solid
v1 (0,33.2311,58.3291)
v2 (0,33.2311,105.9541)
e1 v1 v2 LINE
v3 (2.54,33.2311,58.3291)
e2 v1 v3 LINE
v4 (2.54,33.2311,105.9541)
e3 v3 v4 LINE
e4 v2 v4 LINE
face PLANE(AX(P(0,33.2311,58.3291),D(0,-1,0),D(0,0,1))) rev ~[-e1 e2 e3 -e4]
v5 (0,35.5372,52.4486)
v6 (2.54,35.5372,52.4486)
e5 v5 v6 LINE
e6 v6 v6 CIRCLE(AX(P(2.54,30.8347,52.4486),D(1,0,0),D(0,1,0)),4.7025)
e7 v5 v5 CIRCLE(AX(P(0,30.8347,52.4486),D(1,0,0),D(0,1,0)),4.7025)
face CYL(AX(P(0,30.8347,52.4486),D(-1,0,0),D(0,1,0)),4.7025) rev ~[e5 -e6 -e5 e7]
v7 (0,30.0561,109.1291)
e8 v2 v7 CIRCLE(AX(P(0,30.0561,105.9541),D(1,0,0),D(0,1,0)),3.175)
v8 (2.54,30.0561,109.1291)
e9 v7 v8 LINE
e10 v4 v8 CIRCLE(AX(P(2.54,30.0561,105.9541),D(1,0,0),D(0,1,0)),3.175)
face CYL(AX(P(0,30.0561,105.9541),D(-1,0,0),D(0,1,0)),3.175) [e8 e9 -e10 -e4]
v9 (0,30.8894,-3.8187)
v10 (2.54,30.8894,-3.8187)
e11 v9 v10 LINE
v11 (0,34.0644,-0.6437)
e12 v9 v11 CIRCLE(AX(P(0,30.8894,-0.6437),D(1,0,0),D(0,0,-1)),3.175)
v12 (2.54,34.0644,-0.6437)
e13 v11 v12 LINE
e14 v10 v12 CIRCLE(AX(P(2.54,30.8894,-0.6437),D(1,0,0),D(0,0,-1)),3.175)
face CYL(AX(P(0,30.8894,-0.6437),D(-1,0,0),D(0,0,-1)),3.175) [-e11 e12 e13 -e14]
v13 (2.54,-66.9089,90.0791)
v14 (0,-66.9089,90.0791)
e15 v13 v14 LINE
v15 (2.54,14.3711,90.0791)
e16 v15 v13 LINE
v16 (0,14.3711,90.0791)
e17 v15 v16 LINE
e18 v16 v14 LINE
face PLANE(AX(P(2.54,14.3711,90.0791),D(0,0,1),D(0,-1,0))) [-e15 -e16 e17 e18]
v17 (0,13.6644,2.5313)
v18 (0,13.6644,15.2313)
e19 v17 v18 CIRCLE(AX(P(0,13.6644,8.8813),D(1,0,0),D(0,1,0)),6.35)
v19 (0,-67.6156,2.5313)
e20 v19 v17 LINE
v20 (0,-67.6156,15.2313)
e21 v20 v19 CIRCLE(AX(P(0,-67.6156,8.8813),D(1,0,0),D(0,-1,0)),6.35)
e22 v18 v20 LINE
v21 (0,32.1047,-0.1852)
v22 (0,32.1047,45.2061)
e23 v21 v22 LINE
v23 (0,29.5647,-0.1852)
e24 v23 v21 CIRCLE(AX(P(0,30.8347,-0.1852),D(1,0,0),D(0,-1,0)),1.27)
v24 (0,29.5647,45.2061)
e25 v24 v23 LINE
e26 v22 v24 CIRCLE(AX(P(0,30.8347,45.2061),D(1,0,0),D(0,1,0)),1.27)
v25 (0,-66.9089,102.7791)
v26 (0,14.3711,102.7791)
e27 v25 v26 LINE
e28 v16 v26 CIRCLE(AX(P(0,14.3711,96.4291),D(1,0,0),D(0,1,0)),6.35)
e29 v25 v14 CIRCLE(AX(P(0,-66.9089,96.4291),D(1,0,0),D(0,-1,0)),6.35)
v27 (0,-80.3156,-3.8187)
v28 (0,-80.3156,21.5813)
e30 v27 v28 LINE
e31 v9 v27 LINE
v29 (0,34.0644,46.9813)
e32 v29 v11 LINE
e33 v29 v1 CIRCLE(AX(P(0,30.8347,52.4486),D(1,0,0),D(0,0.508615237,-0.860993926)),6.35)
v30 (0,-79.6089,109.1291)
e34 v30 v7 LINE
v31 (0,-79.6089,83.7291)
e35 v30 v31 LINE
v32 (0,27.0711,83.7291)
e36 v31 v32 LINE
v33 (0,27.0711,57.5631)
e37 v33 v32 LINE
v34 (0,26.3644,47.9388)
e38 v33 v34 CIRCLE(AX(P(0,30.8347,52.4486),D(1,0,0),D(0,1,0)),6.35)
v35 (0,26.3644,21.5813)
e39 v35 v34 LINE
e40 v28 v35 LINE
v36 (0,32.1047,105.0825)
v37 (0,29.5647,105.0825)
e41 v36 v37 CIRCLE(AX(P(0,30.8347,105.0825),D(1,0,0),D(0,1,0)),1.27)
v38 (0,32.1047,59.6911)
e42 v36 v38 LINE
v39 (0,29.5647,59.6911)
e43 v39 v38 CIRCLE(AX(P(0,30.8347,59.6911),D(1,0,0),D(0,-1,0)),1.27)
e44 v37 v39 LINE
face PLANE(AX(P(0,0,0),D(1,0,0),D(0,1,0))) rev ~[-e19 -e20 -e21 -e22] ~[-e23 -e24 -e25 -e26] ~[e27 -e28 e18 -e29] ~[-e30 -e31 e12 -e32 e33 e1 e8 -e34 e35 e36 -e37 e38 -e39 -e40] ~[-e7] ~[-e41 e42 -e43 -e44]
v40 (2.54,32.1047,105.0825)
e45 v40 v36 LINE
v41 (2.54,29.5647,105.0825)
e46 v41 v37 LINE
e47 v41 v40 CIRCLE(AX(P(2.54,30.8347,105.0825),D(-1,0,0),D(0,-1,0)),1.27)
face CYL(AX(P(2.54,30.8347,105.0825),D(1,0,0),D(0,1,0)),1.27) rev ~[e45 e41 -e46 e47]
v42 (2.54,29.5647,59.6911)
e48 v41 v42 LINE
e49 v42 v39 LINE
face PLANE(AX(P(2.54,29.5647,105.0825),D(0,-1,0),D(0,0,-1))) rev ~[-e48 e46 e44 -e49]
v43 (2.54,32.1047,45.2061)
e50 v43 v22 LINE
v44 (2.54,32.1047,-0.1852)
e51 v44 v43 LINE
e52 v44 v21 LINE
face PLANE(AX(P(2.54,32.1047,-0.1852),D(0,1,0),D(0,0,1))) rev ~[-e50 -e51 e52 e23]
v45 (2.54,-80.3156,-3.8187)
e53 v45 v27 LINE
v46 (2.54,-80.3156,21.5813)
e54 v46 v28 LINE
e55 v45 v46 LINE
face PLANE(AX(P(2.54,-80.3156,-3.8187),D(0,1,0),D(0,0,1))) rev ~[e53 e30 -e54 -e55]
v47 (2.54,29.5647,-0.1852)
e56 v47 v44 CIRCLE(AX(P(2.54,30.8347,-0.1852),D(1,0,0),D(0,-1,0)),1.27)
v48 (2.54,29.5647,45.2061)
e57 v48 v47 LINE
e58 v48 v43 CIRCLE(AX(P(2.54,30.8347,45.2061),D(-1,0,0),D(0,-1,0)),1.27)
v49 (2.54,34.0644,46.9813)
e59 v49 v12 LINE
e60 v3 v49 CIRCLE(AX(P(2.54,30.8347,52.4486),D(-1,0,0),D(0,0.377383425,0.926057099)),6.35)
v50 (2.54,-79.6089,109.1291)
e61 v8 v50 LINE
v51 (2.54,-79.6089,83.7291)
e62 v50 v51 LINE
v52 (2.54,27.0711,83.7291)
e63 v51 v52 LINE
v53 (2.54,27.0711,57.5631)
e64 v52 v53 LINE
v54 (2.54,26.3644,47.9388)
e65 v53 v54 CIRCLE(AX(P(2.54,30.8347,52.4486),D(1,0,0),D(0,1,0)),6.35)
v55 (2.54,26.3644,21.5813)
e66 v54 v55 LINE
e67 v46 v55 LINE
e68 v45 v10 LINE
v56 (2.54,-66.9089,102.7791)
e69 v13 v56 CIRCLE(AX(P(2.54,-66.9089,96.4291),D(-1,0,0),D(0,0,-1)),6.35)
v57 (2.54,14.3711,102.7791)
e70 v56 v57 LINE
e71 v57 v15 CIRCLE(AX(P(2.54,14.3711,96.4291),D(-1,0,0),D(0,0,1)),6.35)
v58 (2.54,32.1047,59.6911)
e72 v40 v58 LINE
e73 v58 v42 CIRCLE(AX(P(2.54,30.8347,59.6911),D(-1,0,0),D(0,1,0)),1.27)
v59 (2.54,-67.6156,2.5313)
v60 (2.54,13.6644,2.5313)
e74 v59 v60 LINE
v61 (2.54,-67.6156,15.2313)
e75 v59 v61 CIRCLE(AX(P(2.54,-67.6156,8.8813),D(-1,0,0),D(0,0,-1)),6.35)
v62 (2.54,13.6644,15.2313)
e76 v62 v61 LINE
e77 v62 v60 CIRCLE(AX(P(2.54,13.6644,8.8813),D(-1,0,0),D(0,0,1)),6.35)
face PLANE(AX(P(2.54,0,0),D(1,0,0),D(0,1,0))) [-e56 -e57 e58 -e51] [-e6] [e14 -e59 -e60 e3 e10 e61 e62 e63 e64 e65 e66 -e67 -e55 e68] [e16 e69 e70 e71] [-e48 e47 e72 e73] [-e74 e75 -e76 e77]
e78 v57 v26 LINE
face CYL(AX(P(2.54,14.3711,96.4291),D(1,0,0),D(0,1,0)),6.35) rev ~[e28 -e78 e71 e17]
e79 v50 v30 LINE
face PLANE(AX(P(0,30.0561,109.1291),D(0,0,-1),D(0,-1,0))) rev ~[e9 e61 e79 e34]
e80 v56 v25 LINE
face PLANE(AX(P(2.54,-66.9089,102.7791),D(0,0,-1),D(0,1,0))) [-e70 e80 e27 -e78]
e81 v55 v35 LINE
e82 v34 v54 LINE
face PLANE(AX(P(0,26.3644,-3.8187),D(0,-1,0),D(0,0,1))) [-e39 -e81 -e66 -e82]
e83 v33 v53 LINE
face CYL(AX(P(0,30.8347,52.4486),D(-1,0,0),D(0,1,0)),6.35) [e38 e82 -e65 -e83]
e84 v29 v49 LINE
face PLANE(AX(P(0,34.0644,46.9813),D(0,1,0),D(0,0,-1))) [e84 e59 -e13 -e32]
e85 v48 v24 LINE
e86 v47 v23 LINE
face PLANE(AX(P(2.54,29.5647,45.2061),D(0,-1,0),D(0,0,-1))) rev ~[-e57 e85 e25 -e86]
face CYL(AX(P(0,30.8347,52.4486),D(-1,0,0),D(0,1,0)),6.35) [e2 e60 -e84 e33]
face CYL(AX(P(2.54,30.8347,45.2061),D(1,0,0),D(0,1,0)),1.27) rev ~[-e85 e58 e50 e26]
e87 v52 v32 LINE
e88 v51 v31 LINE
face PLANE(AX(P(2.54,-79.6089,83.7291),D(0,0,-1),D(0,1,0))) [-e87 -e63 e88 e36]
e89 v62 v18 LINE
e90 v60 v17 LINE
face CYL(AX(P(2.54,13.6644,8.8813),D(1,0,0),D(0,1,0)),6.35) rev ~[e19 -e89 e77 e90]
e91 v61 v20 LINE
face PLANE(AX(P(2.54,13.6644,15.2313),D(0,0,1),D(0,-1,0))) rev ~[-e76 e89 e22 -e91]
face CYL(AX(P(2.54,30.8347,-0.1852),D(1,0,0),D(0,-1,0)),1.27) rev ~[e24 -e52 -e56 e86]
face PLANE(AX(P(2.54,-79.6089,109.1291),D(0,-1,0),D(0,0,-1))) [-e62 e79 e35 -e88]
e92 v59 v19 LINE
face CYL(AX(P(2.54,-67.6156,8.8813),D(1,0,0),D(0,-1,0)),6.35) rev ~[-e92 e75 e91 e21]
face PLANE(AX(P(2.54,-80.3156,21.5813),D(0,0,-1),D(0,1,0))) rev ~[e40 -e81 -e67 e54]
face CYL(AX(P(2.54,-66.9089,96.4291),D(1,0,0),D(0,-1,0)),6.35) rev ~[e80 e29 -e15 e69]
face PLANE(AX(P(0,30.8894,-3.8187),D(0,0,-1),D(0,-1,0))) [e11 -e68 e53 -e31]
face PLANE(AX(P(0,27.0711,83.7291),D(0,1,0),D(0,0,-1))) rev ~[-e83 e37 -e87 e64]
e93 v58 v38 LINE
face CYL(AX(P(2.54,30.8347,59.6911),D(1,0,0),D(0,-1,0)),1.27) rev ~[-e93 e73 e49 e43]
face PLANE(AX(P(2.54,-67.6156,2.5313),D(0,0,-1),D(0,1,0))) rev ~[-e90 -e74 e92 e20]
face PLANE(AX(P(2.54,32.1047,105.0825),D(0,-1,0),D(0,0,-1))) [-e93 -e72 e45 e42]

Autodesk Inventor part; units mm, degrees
ref_plane "YZ Plane" through (0, 0, 0) normal (1, 0, 0) x (0, 1, 0)
ref_plane "XZ Plane" through (0, 0, 0) normal (0, 1, 0) x (-1, 0, 0)
ref_plane "XY Plane" through (0, 0, 0) normal (0, 0, 1) x (1, 0, 0)
sketch "Sketch1" plane through (0, 0, 0) normal (1, 0, 0) x (0, 1, 0)
  circle A0 centre (30.8347, 52.4486) radius 6.35
  line L0 (34.0644, 46.9813) -> (34.0644, -0.6437)
  line L1 (33.2311, 58.3291) -> (33.2311, 105.9541)
  line L2 (30.0561, 109.1291) -> (27.0711, 109.1291)
  arc A1 (33.2311, 105.9541) -> (30.0561, 109.1291) centre (30.0561, 105.9541) ccw
  line L3 (30.8894, -3.8187) -> (26.3644, -3.8187)
  arc A2 (30.8894, -3.8187) -> (34.0644, -0.6437) centre (30.8894, -0.6437) ccw
  line L4 (27.0711, 109.1291) -> (27.0711, 57.5631)
  line L5 (26.3644, -3.8187) -> (26.3644, 47.9388)
  line L6 (27.0711, 109.1291) -> (27.0711, 83.7291)
  line L7 (27.0711, 109.1291) -> (-79.6089, 109.1291)
  line L8 (-79.6089, 109.1291) -> (-79.6089, 83.7291)
  line L9 (-79.6089, 83.7291) -> (27.0711, 83.7291)
  line L10 (26.3644, -3.8187) -> (-80.3156, -3.8187)
  line L11 (-80.3156, -3.8187) -> (-80.3156, 21.5813)
  line L12 (26.3644, -3.8187) -> (26.3644, 21.5813)
  line L13 (26.3644, 21.5813) -> (-80.3156, 21.5813)
  circle A3 centre (30.8347, 52.4486) radius 4.7025
  point P0 (34.0644, -3.8187)
  point P1 (33.2311, 109.1291)
  dimension "d3" = 50.8
  dimension "d4" = 50.8
  dimension "d5" = 6.16
  dimension "d6" = 3.175
  dimension "d7" = 3.175
  dimension "d8" = 25.4
  dimension "d9" = 106.68
  dimension "d10" = 106.68
  dimension "d11" = 25.4
  dimension "d13" = 25.4
  dimension "d46" = 12.7
extrude "Extrusion1" add sketch "Sketch1" along normal blind 2.54 contours A0 | A0 L4 L2 A1 L1 | L0 A2 L3 L5 A0
sketch "Sketch2" plane through (2.54, 0, 0) normal (1, 0, 0) x (0, 0, -1)
  line L0 (-109.1291, 27.0711) -> (-57.5631, 27.0711) projected
  line L1 (-109.1291, 27.0711) -> (-109.1291, -79.6089)
  line L2 (-109.1291, -79.6089) -> (-83.7291, -79.6089)
  line L3 (-83.7291, -79.6089) -> (-83.7291, 27.0711)
  line L4 (-109.1291, 27.0711) -> (-83.7291, 27.0711)
  line L5 (3.8187, 26.3644) -> (3.8187, 30.8894) projected
  line L6 (3.8187, 26.3644) -> (3.8187, -80.3156)
  line L7 (3.8187, -80.3156) -> (-21.5813, -80.3156)
  line L8 (-21.5813, -80.3156) -> (-21.5813, 26.3644)
  line L9 (-47.9388, 26.3644) -> (3.8187, 26.3644) projected
  point P0 (0, 0)
  dimension "d16" = 106.68
  dimension "d17" = 25.4
  dimension "d18" = 106.68
  dimension "d19" = 25.4
extrude "Extrusion2" add sketch "Sketch2" against normal up to surface (2.54 mm away)
sketch "Sketch3" plane through (2.54, 0, 0) normal (1, 0, 0) x (0, 0, -1)
  line L0 (-83.7291, -79.6089) -> (-83.7291, 27.0711) projected
  line L1 (-58.3291, 33.2311) -> (-105.9541, 33.2311) projected
  line L2 (-109.1291, 30.0561) -> (-109.1291, -79.6089) projected
  line L3 (-109.1291, -79.6089) -> (-83.7291, -79.6089) projected
  line L4 (-96.4291, 20.7211) -> (-96.4291, 20.7211)
  line L5 (-90.0791, 14.3711) -> (-90.0791, -66.9089)
  line L6 (-96.4291, -73.2589) -> (-96.4291, -73.2589)
  line L7 (-102.7791, -66.9089) -> (-102.7791, 14.3711)
  arc A0 (-96.4291, 20.7211) -> (-102.7791, 14.3711) centre (-96.4291, 14.3711) ccw
  arc A1 (-90.0791, 14.3711) -> (-96.4291, 20.7211) centre (-96.4291, 14.3711) ccw
  arc A2 (-102.7791, -66.9089) -> (-96.4291, -73.2589) centre (-96.4291, -66.9089) ccw
  arc A3 (-96.4291, -73.2589) -> (-90.0791, -66.9089) centre (-96.4291, -66.9089) ccw
  line L8 (-8.8813, 20.0144) -> (-8.8813, 20.0144)
  line L9 (-15.2313, 13.6644) -> (-15.2313, -67.6156)
  line L10 (-8.8813, -73.9656) -> (-8.8813, -73.9656)
  line L11 (-2.5313, -67.6156) -> (-2.5313, 13.6644)
  line L12 (-21.5813, -80.3156) -> (3.8187, -80.3156) projected
  line L13 (-47.9388, 26.3644) -> (-21.5813, 26.3644) projected
  line L14 (3.8187, -80.3156) -> (3.8187, 30.8894) projected
  line L15 (-21.5813, 26.3644) -> (-21.5813, -80.3156) projected
  arc A4 (-8.8813, 20.0144) -> (-15.2313, 13.6644) centre (-8.8813, 13.6644) ccw
  arc A5 (-2.5313, 13.6644) -> (-8.8813, 20.0144) centre (-8.8813, 13.6644) ccw
  arc A6 (-15.2313, -67.6156) -> (-8.8813, -73.9656) centre (-8.8813, -67.6156) ccw
  arc A7 (-8.8813, -73.9656) -> (-2.5313, -67.6156) centre (-8.8813, -67.6156) ccw
  circle A8 centre (-52.4486, 30.8347) radius 4.7025 projected
  line L16 (-57.1511, 30.8347) -> (-59.6911, 30.8347)
  arc A9 (-59.6911, 29.5647) -> (-59.6911, 32.1047) centre (-59.6911, 30.8347) ccw
  line L17 (-107.6225, 30.8347) -> (-105.0825, 30.8347)
  arc A10 (-105.0825, 32.1047) -> (-105.0825, 29.5647) centre (-105.0825, 30.8347) ccw
  line L18 (-105.0825, 32.1047) -> (-59.6911, 32.1047)
  line L19 (-105.0825, 29.5647) -> (-59.6911, 29.5647)
  line L20 (-47.7461, 30.8347) -> (-45.2061, 30.8347)
  arc A11 (-45.2061, 32.1047) -> (-45.2061, 29.5647) centre (-45.2061, 30.8347) ccw
  arc A12 (0.1852, 29.5647) -> (0.1852, 32.1047) centre (0.1852, 30.8347) ccw
  line L21 (0.1852, 32.1047) -> (-45.2061, 32.1047)
  line L22 (-45.2061, 29.5647) -> (0.1852, 29.5647)
  point P0 (0, 0)
  point P1 (-8.8813, 20.0144)
  point P2 (-8.8813, -73.9656)
  dimension "d26" = 6.35
  dimension "d27" = 6.35
  dimension "d28" = 6.35
  dimension "d29" = 6.35
  dimension "d30" = 6.35
  dimension "d31" = 6.35
  dimension "d32" = 6.35
  dimension "d33" = 6.35
  dimension "d34" = 6.35
  dimension "d35" = 6.35
  dimension "d36" = 2.54
  dimension "d37" = 2.54
  dimension "d38" = 2.54
  dimension "d39" = 2.54
  dimension "d40" = 2.54
  dimension "d41" = 2.54
  dimension "d43" = 2.54
extrude "Extrusion3" cut sketch "Sketch3" against normal through all contours L5 A3 A2 L7 A0 A1 | A4 A5 L11 A7 A6 L9 | L19 A10 L18 A9 | L21 A12 L22 A11
properties part number "Monitor Part ReDes"
